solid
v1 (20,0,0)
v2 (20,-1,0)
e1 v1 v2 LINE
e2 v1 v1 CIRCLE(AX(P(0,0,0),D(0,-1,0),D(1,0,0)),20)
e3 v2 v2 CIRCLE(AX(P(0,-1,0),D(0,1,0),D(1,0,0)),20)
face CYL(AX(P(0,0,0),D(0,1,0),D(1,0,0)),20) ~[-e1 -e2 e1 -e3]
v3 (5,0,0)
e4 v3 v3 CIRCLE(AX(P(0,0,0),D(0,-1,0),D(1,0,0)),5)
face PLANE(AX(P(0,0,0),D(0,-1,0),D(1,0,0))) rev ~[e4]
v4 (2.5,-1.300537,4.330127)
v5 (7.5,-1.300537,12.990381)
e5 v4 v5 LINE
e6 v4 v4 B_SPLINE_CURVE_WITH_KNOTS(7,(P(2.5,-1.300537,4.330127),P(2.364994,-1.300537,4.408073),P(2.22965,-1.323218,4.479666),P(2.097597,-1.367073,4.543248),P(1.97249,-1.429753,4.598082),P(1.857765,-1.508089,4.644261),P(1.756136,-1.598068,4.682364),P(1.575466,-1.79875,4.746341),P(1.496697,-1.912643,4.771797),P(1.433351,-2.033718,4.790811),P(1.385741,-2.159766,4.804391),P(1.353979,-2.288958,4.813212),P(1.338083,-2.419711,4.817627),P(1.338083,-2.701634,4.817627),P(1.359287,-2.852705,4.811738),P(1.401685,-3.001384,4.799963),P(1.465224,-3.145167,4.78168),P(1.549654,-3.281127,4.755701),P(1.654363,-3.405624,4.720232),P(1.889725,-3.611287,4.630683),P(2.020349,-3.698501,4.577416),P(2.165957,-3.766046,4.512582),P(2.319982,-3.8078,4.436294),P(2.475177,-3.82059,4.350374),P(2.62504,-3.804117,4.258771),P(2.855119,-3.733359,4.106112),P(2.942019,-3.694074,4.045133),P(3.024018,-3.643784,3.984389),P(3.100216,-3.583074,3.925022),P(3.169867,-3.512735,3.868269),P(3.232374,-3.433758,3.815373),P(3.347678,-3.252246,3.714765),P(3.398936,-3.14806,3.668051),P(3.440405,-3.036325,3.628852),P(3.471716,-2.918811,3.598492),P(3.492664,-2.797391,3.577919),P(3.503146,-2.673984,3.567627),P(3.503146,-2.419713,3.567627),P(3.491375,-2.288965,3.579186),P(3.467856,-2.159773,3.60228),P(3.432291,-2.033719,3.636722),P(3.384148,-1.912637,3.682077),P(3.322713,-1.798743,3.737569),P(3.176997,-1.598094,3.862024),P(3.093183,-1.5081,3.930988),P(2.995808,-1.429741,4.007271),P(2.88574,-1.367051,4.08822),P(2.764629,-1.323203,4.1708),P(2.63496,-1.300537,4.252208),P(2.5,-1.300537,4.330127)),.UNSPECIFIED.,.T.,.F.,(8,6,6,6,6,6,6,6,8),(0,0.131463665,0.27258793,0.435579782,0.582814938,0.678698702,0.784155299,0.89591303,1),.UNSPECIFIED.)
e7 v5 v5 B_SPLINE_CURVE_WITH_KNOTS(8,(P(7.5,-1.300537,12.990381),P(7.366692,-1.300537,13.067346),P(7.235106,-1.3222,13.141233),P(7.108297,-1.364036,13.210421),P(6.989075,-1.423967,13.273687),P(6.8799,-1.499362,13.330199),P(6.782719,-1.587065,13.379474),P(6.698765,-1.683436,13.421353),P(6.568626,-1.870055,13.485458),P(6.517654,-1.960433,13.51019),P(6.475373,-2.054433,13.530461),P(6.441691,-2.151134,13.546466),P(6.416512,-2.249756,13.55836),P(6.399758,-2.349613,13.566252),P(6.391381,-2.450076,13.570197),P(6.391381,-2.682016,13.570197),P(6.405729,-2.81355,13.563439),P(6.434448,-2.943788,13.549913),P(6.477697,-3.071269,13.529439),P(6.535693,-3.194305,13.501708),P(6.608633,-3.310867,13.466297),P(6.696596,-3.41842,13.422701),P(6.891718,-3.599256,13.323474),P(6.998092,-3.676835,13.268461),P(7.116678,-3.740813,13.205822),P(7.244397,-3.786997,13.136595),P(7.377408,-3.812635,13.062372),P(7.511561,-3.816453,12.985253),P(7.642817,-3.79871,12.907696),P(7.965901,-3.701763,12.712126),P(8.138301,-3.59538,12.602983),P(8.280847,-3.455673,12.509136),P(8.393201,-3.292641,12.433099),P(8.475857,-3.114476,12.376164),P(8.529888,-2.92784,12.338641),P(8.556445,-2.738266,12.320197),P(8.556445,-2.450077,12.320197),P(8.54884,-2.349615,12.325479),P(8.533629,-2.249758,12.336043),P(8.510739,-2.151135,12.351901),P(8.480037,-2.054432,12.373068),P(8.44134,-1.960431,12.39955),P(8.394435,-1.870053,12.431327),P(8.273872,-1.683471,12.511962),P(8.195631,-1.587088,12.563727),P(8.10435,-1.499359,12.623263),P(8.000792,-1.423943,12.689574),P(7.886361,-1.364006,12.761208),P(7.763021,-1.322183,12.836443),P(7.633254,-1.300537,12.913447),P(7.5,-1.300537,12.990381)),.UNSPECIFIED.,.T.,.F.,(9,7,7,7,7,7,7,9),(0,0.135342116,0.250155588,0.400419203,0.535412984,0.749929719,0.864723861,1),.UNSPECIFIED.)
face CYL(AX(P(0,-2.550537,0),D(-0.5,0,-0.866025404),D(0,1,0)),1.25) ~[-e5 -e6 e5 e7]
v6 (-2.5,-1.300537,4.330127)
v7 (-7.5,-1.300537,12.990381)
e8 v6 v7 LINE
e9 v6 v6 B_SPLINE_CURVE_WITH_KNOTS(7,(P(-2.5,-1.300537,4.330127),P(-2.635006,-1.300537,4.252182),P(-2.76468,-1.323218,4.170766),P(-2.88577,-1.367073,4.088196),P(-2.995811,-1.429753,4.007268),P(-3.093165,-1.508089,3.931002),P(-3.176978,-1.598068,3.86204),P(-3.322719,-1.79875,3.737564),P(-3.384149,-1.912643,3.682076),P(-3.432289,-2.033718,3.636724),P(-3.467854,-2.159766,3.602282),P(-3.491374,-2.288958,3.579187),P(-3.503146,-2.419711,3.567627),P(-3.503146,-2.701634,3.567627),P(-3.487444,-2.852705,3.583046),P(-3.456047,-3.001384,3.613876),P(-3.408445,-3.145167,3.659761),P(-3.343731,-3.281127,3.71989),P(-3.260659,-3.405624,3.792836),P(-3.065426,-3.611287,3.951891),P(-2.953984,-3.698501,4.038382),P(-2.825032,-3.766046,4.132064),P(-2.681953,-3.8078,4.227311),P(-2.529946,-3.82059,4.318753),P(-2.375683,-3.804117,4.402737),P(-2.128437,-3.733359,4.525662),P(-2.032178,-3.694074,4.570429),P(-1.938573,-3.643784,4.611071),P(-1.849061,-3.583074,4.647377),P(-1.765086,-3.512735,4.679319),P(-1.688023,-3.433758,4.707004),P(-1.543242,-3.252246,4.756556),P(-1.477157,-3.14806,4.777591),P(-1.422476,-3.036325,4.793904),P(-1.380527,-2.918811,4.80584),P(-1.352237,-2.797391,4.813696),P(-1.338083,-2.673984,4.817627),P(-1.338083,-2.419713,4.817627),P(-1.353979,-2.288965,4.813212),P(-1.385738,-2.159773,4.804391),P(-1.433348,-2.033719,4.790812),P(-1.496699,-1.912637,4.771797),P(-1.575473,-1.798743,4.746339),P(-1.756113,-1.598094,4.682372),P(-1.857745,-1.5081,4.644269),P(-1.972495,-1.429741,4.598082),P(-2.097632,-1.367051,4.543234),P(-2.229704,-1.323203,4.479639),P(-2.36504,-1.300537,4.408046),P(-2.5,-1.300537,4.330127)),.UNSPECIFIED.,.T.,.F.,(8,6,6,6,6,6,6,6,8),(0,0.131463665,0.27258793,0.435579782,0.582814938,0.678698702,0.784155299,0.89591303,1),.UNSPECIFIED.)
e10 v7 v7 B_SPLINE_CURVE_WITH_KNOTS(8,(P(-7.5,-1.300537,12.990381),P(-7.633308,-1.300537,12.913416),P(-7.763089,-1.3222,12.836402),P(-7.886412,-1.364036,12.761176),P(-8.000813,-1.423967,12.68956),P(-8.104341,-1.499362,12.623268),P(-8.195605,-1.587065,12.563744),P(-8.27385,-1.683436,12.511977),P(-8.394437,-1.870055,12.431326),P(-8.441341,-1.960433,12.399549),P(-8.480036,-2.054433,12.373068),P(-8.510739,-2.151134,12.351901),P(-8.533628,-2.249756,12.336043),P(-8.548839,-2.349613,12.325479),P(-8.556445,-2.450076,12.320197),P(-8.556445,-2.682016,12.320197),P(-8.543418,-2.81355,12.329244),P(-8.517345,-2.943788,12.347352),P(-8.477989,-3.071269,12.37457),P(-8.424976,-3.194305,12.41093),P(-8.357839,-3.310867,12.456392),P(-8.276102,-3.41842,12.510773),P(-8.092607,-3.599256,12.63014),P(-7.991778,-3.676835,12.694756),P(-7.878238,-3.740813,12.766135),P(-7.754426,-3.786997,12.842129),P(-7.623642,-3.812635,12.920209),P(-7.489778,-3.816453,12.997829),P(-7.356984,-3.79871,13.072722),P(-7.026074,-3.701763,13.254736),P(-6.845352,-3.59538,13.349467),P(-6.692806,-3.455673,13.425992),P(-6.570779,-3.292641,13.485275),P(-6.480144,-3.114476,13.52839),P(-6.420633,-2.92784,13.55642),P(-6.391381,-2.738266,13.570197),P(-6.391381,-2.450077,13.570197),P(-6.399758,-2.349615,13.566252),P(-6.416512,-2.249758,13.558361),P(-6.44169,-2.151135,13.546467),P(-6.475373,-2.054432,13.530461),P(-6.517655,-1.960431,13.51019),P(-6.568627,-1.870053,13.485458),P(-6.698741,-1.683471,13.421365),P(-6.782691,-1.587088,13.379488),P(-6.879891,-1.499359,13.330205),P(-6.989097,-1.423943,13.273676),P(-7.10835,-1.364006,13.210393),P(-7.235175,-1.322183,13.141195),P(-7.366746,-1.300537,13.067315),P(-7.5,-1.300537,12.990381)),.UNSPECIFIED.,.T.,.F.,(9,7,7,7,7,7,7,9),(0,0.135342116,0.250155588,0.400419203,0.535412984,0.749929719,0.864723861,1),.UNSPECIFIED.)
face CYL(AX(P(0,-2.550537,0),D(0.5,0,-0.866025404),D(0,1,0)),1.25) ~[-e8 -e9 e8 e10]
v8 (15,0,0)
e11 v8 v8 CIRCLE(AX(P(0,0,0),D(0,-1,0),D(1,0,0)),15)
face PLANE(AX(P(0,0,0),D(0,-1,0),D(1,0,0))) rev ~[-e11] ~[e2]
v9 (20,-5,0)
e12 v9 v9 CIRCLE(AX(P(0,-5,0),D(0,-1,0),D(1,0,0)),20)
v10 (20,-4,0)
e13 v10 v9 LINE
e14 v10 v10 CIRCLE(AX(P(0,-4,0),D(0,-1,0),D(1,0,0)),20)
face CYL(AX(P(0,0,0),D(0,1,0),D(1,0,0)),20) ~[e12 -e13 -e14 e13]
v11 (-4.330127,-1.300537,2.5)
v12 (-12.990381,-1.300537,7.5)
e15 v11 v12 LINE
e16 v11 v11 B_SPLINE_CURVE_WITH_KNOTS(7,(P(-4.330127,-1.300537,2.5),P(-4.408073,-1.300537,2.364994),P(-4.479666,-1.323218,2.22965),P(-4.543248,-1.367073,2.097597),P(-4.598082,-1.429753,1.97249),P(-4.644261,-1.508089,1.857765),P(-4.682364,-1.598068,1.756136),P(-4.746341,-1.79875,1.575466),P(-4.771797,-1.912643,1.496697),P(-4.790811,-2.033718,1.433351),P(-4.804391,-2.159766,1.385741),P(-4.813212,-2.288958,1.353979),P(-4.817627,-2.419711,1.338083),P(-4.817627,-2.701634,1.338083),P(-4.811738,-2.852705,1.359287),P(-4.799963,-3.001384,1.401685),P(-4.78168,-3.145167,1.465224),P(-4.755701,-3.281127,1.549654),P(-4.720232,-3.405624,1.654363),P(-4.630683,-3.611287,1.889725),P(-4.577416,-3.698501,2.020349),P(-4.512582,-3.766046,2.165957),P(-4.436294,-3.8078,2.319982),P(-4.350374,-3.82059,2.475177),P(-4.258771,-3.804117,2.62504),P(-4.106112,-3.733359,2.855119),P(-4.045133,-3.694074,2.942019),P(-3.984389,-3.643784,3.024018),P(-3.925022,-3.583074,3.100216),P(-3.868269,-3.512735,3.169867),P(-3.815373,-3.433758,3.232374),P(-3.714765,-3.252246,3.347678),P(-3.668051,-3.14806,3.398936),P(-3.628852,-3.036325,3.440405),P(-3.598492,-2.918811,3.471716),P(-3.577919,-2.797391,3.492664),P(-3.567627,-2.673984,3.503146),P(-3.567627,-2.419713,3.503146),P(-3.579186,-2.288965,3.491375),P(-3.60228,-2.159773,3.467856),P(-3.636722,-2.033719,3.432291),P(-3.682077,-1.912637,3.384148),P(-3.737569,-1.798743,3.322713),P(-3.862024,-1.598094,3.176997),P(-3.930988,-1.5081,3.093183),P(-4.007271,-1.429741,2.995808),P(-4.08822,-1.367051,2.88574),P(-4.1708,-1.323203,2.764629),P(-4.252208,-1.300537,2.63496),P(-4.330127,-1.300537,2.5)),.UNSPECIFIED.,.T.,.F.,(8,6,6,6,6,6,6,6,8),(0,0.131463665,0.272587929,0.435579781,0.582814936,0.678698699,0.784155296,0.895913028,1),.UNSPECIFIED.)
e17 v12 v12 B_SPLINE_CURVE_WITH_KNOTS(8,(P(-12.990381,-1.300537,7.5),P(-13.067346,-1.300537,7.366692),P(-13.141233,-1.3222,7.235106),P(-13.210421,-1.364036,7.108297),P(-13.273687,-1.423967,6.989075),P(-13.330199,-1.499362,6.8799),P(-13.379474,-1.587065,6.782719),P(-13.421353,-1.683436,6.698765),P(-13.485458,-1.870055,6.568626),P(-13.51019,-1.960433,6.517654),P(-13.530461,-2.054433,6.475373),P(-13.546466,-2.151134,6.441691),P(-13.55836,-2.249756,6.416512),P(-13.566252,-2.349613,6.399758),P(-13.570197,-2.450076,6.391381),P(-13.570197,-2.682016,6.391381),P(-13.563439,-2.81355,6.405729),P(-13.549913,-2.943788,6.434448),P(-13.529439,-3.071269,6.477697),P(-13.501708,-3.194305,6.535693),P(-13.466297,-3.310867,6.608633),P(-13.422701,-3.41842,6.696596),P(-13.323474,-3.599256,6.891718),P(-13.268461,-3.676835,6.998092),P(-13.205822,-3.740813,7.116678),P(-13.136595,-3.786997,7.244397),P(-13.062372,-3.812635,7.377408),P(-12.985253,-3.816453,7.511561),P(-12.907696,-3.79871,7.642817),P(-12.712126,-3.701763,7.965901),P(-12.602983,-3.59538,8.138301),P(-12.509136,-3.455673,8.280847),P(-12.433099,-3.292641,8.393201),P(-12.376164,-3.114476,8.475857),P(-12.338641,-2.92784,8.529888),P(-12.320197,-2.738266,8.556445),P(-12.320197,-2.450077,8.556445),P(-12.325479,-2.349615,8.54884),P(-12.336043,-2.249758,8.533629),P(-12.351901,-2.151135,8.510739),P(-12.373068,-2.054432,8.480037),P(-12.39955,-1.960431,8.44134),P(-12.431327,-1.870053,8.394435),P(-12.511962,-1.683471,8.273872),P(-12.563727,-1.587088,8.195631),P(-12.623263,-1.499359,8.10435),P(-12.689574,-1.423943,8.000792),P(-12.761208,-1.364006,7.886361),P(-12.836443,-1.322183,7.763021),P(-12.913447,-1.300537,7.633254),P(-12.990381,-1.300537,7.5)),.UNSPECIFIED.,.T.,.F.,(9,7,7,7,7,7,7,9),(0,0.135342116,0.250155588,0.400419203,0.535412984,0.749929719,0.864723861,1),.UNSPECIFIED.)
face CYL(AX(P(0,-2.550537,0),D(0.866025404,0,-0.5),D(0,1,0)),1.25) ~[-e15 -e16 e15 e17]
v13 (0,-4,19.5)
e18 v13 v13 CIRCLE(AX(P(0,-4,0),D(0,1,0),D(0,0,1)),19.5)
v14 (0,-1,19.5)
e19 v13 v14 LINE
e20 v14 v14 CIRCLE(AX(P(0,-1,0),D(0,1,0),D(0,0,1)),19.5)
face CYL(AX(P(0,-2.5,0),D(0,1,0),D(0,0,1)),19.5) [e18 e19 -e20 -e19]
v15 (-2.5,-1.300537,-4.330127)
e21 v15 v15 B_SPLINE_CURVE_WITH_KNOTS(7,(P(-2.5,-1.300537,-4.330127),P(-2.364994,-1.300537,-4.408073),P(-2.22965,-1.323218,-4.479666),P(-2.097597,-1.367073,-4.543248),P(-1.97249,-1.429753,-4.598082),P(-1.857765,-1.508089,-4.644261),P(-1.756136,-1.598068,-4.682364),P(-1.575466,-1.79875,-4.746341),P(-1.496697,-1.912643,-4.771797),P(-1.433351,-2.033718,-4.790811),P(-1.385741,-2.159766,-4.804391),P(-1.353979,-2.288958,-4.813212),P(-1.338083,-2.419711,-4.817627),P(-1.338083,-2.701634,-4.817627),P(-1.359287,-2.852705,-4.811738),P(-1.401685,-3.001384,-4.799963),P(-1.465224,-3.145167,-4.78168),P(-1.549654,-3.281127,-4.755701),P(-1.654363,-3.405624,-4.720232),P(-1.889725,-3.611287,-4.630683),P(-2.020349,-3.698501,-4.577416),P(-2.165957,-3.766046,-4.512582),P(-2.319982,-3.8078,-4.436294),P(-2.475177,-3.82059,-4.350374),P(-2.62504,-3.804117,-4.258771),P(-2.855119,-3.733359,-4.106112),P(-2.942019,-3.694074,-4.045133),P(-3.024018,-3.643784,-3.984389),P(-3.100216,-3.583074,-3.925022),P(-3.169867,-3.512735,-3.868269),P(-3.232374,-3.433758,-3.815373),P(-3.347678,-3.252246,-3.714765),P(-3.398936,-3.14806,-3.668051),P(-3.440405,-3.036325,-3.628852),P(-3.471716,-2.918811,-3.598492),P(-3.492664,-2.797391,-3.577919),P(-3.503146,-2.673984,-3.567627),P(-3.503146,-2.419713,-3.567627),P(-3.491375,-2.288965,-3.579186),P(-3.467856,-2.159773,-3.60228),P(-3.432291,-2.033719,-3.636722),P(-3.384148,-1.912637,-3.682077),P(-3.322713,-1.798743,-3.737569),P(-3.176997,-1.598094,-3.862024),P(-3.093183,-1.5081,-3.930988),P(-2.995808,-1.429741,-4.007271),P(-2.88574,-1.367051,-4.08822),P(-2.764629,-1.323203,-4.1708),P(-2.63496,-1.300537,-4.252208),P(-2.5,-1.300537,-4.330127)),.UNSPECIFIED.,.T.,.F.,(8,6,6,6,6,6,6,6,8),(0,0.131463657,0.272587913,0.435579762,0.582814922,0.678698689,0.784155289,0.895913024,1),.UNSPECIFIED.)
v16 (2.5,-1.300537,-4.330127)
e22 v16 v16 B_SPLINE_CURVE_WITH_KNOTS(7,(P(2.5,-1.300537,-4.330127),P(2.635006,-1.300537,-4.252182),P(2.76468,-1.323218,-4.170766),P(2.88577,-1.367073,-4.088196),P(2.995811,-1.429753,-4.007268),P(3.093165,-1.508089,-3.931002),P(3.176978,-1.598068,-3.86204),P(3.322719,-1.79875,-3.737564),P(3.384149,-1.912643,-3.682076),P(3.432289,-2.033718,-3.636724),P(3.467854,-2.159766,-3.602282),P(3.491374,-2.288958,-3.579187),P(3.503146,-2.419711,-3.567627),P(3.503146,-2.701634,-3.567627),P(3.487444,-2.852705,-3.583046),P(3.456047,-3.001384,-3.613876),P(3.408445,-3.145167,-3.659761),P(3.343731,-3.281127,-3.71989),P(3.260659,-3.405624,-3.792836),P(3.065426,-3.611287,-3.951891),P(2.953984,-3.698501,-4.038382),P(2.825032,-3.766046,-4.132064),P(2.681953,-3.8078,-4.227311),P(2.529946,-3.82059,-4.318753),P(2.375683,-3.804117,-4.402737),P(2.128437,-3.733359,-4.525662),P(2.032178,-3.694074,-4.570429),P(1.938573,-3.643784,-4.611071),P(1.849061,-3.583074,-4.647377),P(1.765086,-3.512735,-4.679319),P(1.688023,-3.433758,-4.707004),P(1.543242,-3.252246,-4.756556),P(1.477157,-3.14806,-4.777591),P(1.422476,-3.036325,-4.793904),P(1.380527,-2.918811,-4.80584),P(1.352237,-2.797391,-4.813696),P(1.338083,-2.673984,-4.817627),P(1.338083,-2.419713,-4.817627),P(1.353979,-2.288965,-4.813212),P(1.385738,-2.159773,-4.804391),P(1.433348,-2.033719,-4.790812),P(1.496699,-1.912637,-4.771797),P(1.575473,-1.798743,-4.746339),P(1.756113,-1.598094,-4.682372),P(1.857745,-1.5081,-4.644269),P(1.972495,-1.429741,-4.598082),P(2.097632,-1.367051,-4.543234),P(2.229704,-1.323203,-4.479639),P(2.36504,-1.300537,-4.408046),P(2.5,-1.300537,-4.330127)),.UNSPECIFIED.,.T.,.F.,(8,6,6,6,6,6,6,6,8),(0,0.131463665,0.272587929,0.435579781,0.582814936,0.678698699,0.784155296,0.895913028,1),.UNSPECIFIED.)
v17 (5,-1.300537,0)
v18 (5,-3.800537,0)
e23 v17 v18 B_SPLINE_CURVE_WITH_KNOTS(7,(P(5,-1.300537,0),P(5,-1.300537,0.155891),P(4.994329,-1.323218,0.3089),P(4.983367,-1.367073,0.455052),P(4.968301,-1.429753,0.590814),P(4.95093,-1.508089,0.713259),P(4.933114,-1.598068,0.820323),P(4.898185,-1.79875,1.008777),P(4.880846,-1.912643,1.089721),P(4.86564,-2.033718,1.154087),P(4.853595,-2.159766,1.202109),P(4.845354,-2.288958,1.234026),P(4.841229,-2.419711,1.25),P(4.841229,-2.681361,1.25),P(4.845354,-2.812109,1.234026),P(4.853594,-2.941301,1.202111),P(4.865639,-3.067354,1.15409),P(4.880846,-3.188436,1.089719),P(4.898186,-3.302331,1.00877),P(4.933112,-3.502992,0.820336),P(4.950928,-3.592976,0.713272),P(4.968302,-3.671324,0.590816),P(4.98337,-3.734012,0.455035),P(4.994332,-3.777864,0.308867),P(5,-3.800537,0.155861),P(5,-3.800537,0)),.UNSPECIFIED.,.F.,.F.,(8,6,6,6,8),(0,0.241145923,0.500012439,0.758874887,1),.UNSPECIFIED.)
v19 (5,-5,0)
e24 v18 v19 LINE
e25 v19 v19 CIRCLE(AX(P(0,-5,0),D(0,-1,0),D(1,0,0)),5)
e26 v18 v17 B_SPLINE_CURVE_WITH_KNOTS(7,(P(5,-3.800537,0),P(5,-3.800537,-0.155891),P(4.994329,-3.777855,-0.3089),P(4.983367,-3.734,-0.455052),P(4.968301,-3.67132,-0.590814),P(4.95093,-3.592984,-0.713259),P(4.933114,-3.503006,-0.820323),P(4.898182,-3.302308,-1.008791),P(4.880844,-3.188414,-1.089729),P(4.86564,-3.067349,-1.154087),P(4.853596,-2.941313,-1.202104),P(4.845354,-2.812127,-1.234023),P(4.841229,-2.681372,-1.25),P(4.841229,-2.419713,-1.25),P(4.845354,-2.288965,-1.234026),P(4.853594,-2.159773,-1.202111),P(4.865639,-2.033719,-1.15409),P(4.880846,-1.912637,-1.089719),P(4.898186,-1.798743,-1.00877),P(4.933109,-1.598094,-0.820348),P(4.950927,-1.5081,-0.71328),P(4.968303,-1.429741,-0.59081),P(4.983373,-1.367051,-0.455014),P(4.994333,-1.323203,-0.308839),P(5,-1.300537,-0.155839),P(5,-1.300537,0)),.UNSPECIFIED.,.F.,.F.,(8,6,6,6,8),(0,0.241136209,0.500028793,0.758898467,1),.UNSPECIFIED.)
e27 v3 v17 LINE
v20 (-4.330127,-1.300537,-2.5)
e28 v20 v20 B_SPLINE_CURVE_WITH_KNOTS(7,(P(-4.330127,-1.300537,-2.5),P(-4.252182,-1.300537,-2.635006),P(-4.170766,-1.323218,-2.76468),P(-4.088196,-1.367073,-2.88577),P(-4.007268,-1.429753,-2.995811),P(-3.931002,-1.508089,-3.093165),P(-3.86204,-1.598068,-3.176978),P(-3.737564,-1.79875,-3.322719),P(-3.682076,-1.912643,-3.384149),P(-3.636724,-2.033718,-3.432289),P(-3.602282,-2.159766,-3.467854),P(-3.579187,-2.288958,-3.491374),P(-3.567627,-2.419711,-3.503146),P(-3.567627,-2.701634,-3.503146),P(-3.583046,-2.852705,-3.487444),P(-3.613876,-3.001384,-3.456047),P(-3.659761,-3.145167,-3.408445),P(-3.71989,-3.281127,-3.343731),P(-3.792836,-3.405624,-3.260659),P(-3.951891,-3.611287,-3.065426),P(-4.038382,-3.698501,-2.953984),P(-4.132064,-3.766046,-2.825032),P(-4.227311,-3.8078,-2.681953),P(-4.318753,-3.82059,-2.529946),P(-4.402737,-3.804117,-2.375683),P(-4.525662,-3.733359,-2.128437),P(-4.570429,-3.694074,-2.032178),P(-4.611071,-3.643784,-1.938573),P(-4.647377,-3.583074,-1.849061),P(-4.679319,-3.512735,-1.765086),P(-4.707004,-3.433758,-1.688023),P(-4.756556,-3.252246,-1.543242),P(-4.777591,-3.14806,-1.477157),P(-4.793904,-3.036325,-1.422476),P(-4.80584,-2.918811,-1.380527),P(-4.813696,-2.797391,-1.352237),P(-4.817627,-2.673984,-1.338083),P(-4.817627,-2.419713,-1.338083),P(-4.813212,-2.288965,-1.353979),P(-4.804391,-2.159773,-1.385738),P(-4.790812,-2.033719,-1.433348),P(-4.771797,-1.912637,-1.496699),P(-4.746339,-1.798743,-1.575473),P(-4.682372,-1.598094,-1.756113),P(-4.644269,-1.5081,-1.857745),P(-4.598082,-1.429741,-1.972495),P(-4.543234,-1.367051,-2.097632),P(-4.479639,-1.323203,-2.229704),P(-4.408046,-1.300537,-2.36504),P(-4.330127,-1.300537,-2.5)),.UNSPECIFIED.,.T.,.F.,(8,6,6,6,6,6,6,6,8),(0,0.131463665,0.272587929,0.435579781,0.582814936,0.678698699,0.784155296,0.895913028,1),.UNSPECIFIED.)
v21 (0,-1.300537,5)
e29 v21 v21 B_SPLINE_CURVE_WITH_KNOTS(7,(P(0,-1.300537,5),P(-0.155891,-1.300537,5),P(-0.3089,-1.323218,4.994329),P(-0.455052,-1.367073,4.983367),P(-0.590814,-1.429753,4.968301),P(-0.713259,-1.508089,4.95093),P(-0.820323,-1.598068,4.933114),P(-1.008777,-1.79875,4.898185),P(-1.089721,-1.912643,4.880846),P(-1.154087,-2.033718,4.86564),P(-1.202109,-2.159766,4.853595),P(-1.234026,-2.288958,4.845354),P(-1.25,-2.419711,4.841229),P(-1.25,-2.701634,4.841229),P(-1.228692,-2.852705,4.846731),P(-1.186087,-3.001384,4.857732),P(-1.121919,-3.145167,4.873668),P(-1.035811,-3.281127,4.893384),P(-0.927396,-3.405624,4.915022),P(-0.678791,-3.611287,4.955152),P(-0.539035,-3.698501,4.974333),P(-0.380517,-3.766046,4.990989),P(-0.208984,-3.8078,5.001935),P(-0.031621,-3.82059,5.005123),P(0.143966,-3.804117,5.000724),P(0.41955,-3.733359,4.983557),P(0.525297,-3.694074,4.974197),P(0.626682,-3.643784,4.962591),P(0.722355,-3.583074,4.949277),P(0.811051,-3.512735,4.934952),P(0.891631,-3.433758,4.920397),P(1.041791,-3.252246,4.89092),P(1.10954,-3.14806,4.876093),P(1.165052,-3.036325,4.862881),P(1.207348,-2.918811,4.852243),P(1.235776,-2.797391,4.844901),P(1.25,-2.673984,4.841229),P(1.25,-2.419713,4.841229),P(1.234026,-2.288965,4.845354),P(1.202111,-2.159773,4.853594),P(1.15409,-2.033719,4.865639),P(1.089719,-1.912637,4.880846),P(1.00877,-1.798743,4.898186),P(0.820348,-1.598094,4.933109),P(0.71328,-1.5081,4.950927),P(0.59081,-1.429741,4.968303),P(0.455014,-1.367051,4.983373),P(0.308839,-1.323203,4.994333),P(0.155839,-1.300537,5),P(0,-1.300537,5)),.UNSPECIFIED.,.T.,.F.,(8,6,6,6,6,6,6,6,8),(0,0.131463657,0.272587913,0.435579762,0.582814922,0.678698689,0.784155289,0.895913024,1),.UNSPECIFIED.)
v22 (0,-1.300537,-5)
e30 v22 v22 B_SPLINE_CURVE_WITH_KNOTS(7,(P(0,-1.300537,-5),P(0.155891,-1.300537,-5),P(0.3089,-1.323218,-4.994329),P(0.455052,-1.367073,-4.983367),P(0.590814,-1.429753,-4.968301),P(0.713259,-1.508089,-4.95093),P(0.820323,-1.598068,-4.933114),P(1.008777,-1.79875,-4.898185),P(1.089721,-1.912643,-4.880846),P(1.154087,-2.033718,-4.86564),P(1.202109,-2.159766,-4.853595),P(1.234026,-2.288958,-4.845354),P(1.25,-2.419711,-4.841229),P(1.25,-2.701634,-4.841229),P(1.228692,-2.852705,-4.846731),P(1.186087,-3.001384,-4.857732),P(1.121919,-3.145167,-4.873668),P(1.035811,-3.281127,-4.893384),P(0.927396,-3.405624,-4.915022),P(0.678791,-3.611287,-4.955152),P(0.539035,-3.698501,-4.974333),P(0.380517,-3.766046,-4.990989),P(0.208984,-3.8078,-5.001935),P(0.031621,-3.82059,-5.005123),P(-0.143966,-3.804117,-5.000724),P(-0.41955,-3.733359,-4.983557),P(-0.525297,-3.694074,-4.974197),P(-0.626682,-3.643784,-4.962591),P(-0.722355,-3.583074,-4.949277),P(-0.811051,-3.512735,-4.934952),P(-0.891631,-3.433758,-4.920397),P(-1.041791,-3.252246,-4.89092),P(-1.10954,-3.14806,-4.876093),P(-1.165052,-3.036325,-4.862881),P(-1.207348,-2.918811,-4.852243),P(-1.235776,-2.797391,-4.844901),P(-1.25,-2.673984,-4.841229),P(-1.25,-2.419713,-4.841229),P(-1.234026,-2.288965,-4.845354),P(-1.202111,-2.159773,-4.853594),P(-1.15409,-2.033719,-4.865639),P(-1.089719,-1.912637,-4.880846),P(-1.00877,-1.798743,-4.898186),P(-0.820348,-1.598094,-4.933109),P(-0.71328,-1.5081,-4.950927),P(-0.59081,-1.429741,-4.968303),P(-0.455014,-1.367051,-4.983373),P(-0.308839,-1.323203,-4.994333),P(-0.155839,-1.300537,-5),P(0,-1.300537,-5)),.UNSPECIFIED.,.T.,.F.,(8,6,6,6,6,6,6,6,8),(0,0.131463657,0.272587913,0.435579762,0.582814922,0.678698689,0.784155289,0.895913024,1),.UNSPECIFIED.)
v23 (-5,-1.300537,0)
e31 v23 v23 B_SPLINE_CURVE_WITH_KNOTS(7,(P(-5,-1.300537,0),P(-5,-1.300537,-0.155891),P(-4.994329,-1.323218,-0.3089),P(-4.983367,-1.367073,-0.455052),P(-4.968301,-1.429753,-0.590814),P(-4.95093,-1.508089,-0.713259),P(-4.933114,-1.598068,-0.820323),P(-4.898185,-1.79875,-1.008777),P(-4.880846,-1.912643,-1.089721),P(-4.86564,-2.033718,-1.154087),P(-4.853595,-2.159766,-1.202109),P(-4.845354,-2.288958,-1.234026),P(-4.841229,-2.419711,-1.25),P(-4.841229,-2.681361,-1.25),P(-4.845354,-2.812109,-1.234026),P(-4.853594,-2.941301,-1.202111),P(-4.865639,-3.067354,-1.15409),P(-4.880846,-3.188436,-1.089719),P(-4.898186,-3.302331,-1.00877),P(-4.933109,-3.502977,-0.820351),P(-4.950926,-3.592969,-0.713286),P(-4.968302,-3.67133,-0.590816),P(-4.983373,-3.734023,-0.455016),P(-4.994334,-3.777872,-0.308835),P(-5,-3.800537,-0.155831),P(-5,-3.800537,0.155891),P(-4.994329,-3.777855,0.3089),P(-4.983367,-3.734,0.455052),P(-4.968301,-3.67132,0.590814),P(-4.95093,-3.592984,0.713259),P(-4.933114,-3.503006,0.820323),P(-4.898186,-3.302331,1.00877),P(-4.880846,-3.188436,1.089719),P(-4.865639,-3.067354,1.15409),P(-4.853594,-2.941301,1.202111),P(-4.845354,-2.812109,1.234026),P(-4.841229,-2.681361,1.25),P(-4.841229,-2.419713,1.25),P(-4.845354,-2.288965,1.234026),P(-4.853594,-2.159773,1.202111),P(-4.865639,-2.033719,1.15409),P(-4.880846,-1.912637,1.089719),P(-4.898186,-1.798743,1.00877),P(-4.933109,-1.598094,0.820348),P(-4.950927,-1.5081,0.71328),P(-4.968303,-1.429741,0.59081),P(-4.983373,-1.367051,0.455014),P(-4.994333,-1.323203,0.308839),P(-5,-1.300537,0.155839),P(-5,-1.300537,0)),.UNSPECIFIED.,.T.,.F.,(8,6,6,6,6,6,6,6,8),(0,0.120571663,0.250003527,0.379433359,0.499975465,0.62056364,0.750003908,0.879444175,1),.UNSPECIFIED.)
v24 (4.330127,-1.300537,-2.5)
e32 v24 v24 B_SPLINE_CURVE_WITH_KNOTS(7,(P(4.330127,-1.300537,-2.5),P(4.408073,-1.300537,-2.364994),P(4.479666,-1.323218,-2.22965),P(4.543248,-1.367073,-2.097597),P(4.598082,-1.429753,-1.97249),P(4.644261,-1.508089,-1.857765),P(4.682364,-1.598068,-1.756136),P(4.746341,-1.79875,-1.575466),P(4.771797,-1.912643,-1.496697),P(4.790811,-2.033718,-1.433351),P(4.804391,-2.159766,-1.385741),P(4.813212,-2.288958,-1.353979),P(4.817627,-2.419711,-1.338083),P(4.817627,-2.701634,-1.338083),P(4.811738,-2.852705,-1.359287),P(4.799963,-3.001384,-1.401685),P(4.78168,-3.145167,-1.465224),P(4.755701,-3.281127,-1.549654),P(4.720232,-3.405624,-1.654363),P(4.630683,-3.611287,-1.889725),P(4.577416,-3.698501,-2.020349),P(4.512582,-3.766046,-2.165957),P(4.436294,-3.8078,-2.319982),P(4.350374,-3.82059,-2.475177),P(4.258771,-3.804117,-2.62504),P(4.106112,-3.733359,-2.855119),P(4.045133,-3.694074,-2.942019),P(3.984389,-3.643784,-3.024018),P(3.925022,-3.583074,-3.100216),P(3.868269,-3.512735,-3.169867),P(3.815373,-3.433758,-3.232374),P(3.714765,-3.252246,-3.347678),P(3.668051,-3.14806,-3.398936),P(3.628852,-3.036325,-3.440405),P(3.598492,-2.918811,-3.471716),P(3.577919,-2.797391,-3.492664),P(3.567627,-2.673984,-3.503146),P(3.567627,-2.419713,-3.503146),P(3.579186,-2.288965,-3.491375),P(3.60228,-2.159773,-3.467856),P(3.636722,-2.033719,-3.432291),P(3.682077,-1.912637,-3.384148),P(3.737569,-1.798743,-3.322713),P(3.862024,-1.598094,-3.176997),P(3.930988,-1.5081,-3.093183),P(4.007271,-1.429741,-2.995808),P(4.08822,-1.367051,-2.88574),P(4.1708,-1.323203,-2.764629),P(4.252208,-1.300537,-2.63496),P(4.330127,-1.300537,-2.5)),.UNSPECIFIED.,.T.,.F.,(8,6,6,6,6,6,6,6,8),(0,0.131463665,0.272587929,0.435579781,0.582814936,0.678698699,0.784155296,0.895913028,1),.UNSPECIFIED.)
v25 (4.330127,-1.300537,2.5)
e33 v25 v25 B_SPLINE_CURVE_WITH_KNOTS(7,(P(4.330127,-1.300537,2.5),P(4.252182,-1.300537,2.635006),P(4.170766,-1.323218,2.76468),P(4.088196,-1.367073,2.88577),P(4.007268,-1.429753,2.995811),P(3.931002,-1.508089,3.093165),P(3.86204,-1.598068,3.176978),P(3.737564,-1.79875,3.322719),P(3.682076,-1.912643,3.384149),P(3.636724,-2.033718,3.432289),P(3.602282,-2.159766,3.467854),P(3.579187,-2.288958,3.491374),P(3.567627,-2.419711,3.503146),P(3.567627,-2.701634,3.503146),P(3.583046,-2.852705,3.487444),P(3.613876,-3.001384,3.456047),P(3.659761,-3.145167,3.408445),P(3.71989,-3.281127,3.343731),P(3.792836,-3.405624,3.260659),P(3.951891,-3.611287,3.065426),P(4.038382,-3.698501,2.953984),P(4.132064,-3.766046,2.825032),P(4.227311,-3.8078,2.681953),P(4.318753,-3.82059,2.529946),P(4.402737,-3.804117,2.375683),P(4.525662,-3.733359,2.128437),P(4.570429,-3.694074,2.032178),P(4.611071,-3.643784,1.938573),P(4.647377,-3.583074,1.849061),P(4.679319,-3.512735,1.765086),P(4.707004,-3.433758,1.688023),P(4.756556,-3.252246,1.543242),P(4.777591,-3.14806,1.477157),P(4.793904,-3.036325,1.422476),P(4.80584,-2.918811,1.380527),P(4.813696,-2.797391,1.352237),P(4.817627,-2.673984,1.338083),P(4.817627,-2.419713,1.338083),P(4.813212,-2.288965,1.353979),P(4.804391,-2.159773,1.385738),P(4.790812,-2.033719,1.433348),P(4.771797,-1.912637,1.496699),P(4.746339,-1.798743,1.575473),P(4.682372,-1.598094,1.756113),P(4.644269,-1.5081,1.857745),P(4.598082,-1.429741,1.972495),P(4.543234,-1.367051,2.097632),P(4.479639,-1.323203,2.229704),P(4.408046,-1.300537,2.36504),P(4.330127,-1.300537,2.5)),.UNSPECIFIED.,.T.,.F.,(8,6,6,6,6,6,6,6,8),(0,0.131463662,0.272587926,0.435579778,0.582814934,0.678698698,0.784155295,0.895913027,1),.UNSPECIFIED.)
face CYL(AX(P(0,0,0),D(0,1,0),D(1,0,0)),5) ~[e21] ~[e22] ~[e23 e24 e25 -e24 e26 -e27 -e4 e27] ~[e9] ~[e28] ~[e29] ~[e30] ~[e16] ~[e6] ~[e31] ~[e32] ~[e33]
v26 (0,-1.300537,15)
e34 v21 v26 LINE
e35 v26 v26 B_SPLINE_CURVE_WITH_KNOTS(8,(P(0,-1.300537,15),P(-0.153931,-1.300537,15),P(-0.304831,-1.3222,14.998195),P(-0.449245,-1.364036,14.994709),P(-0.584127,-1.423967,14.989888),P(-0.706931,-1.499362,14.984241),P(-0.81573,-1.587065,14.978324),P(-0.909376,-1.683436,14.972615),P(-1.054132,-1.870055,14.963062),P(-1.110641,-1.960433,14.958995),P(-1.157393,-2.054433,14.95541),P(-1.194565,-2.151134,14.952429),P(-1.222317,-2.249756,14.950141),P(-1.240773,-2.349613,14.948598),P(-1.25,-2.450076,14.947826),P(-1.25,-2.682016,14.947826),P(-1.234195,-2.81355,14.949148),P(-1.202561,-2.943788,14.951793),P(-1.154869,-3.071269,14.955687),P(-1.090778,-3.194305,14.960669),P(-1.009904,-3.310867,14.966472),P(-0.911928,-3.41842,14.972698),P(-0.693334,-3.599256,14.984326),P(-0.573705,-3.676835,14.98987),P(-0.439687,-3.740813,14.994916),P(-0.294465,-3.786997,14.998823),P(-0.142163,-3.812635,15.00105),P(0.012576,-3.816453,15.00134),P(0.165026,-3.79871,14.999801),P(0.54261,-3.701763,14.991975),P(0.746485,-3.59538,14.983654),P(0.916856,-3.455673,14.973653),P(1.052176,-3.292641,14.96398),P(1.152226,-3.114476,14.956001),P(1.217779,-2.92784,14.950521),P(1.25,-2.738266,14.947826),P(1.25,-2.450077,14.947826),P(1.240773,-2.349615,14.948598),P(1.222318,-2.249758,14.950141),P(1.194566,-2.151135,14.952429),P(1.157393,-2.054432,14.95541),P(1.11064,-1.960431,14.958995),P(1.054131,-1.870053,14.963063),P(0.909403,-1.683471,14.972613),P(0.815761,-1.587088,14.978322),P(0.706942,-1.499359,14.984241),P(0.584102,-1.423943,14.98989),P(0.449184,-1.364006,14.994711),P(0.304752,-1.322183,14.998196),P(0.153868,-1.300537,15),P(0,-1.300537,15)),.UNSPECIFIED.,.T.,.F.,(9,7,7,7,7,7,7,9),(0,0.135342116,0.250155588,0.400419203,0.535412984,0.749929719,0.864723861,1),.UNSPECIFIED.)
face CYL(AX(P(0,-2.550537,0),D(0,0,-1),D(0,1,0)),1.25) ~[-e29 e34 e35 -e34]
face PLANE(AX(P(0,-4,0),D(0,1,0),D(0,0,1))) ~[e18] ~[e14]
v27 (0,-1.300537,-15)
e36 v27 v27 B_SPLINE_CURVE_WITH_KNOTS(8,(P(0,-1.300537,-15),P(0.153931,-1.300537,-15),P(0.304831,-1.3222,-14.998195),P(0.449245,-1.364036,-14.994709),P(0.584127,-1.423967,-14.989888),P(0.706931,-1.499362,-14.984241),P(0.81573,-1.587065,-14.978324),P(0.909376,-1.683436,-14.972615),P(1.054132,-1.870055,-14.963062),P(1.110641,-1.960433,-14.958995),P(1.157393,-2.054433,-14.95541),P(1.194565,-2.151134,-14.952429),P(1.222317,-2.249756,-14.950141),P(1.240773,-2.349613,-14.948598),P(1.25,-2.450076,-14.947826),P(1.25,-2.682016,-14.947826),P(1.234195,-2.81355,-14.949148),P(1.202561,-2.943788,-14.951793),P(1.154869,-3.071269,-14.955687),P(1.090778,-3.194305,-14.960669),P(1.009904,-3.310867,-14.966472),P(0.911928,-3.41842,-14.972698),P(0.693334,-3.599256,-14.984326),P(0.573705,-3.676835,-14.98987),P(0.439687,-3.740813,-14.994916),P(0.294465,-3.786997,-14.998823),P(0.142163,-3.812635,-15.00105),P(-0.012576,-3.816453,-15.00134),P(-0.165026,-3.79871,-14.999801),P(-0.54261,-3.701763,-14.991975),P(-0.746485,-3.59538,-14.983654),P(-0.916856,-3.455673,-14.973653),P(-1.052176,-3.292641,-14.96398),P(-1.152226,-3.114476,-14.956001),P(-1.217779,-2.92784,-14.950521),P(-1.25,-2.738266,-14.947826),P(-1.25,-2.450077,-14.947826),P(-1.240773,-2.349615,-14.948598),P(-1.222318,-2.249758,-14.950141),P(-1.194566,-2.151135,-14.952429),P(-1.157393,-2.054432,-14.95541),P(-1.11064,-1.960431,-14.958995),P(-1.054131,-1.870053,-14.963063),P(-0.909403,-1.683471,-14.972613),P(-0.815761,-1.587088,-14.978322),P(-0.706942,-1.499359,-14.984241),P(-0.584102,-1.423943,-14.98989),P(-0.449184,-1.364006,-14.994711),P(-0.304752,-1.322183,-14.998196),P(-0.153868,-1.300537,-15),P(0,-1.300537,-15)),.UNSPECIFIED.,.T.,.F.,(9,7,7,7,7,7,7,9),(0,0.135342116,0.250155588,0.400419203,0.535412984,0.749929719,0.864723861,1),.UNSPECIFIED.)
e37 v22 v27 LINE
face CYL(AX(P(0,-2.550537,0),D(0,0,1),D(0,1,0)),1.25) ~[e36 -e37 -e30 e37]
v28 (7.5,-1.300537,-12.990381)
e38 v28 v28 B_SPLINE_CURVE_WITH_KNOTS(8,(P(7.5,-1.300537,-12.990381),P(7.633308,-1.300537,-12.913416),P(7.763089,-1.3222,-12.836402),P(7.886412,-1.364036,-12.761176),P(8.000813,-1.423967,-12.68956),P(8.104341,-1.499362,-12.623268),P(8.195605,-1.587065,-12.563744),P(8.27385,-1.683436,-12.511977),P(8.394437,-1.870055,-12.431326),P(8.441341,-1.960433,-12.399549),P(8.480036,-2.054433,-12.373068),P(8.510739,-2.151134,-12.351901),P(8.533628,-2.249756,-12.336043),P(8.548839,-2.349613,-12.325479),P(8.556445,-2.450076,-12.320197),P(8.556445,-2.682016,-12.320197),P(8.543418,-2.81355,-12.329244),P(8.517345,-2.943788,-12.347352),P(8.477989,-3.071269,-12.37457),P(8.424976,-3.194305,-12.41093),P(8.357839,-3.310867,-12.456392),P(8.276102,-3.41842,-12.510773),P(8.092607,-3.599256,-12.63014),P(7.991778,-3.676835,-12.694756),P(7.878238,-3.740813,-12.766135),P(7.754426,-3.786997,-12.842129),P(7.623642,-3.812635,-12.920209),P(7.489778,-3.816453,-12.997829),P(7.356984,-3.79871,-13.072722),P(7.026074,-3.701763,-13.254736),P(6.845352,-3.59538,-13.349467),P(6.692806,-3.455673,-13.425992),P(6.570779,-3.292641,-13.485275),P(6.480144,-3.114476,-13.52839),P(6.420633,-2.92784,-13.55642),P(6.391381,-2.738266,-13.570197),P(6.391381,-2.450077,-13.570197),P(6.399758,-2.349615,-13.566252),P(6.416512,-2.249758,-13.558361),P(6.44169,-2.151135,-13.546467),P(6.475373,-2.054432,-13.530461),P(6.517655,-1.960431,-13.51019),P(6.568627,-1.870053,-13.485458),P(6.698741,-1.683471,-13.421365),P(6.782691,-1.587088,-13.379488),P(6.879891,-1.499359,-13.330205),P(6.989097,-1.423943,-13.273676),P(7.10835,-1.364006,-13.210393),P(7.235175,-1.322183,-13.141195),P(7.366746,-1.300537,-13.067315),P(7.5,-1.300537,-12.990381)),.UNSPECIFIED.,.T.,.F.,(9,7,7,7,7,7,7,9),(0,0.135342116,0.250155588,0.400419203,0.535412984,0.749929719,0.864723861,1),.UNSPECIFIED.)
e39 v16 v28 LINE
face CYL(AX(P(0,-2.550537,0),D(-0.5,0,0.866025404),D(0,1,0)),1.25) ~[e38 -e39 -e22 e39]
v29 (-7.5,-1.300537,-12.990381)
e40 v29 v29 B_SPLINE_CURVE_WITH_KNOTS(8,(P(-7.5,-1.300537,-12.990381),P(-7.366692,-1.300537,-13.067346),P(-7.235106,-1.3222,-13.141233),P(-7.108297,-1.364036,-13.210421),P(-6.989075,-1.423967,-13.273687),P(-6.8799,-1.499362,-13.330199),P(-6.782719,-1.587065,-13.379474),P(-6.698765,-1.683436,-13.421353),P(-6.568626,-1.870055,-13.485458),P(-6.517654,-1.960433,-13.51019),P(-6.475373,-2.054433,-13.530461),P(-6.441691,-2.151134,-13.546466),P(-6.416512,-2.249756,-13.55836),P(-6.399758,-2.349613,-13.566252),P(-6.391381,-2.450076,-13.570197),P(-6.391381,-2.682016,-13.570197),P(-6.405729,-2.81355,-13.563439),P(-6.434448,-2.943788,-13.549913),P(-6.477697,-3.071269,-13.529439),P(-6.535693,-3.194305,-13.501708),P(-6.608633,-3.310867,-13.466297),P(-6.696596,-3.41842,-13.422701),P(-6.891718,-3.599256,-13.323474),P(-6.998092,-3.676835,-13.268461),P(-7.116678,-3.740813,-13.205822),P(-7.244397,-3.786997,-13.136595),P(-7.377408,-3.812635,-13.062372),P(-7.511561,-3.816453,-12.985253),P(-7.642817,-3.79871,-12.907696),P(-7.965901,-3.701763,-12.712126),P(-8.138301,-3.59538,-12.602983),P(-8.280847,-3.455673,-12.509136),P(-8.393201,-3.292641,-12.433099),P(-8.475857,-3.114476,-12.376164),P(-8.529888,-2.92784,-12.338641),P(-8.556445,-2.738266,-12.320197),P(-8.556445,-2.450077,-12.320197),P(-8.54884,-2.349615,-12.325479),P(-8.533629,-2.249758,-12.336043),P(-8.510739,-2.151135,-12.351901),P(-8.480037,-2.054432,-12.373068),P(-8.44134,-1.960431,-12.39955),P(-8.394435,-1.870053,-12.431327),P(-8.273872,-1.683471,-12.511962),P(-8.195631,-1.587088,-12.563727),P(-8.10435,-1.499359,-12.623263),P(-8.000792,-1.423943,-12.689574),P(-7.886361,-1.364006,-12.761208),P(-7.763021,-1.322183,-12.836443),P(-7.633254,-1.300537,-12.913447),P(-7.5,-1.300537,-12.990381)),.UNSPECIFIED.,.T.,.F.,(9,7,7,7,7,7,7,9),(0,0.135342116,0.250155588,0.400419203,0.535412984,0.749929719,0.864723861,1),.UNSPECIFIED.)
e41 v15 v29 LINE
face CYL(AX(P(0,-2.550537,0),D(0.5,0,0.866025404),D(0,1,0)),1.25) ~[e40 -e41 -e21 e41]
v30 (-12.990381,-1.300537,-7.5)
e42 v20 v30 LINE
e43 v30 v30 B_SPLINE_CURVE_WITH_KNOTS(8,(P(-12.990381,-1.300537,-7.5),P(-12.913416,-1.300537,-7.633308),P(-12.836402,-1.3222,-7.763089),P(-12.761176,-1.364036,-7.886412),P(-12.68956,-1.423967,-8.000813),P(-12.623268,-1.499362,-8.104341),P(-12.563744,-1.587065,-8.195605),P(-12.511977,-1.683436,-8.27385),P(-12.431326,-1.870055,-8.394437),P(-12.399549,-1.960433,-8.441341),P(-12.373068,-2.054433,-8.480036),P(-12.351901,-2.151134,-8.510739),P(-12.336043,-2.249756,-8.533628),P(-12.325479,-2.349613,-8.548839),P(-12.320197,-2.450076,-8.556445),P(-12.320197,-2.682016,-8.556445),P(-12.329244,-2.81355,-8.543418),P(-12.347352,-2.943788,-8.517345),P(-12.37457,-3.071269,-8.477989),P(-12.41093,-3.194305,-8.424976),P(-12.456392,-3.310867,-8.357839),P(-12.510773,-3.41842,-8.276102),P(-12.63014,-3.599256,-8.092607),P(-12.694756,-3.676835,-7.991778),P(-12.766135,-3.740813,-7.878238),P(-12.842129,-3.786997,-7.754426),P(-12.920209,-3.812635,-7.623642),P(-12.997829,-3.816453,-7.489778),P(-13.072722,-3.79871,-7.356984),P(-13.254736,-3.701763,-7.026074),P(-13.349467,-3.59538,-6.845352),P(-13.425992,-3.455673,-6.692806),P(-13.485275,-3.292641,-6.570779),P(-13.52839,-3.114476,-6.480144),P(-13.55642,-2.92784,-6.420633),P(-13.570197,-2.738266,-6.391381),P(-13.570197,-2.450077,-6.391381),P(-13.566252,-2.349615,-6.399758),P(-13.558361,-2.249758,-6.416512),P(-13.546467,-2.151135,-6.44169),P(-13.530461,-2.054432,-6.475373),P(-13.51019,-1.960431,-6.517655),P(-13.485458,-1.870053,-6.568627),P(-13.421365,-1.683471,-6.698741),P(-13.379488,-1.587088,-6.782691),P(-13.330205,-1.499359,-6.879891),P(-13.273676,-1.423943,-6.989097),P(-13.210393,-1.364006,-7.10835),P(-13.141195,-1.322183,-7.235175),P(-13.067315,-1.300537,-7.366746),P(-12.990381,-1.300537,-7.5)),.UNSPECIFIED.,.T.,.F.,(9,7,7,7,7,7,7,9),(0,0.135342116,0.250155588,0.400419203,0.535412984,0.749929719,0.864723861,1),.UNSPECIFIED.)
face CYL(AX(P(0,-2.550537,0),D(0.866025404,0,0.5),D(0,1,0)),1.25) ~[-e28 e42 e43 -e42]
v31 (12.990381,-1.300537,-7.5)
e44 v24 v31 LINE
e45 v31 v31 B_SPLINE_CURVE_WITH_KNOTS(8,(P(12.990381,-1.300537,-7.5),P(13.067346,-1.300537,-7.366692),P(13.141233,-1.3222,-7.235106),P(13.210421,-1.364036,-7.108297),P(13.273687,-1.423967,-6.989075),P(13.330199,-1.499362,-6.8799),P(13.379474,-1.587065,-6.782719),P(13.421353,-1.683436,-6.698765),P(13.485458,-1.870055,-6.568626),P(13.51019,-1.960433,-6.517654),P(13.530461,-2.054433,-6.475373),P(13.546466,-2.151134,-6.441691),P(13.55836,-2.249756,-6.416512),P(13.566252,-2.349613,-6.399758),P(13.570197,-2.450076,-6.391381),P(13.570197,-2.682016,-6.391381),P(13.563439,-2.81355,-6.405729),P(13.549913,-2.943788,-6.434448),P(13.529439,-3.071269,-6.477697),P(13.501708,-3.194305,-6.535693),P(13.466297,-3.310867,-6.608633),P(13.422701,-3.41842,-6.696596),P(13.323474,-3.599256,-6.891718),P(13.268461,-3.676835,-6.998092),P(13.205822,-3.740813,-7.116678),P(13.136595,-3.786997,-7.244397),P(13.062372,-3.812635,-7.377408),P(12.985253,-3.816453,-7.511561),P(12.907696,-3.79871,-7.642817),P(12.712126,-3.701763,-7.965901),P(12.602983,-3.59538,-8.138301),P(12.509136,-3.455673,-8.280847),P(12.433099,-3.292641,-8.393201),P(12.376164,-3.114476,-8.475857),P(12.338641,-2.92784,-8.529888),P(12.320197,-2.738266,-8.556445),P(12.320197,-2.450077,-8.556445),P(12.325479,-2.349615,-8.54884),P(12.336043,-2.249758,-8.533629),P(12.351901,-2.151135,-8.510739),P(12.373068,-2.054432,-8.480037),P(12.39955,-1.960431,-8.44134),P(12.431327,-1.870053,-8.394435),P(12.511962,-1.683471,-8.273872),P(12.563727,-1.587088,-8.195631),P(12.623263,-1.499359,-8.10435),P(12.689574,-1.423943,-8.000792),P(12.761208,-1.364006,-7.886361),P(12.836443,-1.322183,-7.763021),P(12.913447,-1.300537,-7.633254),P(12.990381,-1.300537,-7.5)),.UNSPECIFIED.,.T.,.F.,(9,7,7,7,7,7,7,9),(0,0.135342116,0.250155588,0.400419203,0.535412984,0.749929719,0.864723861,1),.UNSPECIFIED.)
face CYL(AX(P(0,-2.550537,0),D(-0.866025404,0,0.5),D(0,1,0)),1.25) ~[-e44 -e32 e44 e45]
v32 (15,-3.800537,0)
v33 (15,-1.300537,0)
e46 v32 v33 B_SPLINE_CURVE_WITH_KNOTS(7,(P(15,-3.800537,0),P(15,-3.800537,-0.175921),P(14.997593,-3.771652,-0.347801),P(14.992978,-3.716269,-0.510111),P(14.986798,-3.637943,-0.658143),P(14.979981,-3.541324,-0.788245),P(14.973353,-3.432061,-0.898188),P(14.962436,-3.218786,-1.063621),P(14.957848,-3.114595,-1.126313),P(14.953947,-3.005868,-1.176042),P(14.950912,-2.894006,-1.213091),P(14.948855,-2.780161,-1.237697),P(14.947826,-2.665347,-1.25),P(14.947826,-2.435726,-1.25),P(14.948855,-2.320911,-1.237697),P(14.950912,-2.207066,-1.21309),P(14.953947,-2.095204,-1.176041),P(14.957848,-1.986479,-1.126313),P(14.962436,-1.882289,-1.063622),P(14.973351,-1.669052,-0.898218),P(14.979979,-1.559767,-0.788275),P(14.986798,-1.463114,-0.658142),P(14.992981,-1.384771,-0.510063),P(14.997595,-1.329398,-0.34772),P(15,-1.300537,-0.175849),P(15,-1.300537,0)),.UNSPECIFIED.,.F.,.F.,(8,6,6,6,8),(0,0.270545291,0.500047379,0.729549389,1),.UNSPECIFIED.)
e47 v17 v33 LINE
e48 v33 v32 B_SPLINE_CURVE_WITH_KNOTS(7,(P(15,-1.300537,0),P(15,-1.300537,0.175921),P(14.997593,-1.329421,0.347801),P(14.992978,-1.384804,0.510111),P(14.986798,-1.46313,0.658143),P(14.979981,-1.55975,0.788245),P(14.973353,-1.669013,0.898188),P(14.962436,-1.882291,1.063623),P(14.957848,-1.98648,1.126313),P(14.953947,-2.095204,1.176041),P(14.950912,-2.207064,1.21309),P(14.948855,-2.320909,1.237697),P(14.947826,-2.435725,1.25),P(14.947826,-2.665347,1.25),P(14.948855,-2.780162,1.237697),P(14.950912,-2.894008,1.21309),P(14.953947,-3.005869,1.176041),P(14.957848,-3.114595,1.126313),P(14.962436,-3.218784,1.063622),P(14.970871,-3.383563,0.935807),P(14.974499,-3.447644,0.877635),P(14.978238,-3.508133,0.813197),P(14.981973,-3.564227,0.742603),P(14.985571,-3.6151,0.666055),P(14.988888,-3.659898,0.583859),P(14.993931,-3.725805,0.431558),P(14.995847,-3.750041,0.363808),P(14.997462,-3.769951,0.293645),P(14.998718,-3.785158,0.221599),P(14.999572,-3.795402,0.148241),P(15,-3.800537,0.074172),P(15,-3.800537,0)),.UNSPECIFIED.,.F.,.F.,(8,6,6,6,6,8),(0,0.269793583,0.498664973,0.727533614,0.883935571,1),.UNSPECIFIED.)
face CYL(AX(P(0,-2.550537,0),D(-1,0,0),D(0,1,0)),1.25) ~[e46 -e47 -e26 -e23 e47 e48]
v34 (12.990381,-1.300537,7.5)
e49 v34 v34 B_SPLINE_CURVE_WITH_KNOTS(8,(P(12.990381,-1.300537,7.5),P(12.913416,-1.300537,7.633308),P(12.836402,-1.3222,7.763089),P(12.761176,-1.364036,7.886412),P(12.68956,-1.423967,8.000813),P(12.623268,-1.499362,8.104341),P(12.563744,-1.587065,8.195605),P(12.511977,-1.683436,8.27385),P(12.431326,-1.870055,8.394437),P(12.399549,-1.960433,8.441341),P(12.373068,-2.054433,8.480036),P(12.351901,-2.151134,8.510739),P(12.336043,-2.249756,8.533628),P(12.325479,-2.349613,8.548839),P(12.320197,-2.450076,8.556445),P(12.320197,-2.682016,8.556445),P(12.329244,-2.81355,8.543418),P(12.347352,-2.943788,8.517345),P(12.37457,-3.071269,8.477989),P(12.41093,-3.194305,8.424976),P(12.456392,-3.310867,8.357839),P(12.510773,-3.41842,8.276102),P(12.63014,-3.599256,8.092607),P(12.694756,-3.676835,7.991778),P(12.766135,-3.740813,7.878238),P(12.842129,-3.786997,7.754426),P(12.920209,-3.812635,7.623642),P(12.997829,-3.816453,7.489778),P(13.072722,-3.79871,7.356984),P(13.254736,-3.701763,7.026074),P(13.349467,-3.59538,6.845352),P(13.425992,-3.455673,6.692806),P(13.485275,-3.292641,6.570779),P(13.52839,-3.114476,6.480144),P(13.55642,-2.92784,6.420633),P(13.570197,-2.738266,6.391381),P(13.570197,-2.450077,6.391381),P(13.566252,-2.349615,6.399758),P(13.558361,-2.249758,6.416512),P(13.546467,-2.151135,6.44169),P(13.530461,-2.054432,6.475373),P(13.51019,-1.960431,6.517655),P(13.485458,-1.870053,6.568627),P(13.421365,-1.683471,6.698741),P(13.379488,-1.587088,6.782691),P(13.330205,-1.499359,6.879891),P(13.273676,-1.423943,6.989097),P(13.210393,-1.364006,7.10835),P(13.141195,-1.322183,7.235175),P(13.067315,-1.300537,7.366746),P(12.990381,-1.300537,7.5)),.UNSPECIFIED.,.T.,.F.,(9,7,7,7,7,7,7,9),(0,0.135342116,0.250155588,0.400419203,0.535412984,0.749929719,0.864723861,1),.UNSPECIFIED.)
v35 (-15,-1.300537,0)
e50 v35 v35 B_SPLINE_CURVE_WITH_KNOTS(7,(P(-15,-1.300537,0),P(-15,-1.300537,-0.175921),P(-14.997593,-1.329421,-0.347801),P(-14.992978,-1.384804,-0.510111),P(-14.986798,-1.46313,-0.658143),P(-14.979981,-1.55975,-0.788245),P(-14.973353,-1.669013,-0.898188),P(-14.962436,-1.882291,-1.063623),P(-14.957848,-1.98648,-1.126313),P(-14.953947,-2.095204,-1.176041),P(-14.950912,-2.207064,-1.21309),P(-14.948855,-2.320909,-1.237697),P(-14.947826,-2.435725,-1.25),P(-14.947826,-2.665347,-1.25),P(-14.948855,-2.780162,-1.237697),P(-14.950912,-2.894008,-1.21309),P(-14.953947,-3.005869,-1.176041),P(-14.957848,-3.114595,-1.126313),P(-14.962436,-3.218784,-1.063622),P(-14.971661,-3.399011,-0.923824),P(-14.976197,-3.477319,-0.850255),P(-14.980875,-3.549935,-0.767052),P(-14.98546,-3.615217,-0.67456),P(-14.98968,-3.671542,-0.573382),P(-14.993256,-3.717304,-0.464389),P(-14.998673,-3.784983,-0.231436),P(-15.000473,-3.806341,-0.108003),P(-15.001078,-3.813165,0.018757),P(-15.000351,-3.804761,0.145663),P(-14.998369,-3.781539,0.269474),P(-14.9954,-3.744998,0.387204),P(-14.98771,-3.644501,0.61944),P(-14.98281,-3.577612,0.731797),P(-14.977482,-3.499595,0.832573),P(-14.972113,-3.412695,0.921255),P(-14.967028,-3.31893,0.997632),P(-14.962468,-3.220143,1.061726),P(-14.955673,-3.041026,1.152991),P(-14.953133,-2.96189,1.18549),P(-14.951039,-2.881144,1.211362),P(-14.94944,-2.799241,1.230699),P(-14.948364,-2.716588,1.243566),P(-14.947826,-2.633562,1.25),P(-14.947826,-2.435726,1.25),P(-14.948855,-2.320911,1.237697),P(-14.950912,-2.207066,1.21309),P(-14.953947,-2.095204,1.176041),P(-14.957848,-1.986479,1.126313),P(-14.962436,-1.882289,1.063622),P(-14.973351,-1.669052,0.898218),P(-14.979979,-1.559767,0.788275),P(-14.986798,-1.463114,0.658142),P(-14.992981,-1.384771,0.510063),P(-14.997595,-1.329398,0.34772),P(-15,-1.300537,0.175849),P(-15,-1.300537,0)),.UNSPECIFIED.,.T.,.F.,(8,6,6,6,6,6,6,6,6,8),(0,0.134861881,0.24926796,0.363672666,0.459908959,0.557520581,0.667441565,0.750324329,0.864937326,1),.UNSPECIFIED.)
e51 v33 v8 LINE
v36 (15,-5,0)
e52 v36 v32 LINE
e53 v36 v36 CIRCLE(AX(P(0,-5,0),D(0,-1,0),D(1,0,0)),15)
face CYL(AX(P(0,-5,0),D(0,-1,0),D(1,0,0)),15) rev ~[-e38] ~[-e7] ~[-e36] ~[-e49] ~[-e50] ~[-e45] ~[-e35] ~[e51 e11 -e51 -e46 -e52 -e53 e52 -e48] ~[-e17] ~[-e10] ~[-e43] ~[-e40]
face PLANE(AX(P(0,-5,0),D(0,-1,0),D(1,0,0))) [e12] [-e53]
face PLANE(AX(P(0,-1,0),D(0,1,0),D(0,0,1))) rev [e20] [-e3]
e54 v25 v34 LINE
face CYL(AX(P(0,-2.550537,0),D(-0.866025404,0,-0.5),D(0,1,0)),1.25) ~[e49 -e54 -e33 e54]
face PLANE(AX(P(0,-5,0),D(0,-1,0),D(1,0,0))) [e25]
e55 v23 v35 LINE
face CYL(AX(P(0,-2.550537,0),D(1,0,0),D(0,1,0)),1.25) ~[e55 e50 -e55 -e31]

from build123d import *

# Parameters (mm, degrees)
F0_R            = 20
F1_DEPTH        = 5
F2_R            = 15
F3_DEPTH        = 5
F4_R            = 5
F5_DEPTH        = 5
F6_R            = 1.25
F7_DEPTH        = 19
F7_COPIES_COUNT = 12
F8_W            = 3
F8_H            = 0.5


# Not quite as in the source:
# - a pattern or mirror of a feature is missing from the dataset's text; its kind, count and spacing are read off the source's solid


with BuildPart() as f1:
    # F0 (on Front) → F1 (new body)
    with BuildSketch(Plane.XZ):
        Circle(F0_R)
    extrude(amount=F1_DEPTH)

    # F2 (on face) → F3 (cut)
    with BuildSketch(Plane.XZ.offset(5)):
        Circle(F2_R)
    extrude(amount=-F3_DEPTH, mode=Mode.SUBTRACT)



with BuildPart() as f5:
    # F4 (on Front) → F5 (new body)
    with BuildSketch(Plane.XZ):
        Circle(F4_R)
    extrude(amount=F5_DEPTH)


with BuildPart() as f1_1:
    add(f1.part)

    add(f5.part)  # F7 merges F5
    # F6 (on Right) → F7 (join)
    with BuildSketch(Plane.YZ):
        with Locations((-2.5505366686, 0)):
            Circle(F6_R)
    f7 = extrude(amount=F7_DEPTH)

    # F7_copies: F7 ×12 about axis
    f7_copies_axis = Axis((0, 0, 0), (0, 1, 0))
    for i in range(1, F7_COPIES_COUNT):
        add(f7.rotate(f7_copies_axis, i * 360 / F7_COPIES_COUNT))

    # F8 (on Right) → F9 (revolve, cut)
    with BuildSketch(Plane.YZ):
        with Locations((-2.5, 19.75)):
            Rectangle(F8_W, F8_H)
    revolve(axis=Axis((0, 0, 0), (0, 1, 0)), mode=Mode.SUBTRACT)


solid = f1_1.part
